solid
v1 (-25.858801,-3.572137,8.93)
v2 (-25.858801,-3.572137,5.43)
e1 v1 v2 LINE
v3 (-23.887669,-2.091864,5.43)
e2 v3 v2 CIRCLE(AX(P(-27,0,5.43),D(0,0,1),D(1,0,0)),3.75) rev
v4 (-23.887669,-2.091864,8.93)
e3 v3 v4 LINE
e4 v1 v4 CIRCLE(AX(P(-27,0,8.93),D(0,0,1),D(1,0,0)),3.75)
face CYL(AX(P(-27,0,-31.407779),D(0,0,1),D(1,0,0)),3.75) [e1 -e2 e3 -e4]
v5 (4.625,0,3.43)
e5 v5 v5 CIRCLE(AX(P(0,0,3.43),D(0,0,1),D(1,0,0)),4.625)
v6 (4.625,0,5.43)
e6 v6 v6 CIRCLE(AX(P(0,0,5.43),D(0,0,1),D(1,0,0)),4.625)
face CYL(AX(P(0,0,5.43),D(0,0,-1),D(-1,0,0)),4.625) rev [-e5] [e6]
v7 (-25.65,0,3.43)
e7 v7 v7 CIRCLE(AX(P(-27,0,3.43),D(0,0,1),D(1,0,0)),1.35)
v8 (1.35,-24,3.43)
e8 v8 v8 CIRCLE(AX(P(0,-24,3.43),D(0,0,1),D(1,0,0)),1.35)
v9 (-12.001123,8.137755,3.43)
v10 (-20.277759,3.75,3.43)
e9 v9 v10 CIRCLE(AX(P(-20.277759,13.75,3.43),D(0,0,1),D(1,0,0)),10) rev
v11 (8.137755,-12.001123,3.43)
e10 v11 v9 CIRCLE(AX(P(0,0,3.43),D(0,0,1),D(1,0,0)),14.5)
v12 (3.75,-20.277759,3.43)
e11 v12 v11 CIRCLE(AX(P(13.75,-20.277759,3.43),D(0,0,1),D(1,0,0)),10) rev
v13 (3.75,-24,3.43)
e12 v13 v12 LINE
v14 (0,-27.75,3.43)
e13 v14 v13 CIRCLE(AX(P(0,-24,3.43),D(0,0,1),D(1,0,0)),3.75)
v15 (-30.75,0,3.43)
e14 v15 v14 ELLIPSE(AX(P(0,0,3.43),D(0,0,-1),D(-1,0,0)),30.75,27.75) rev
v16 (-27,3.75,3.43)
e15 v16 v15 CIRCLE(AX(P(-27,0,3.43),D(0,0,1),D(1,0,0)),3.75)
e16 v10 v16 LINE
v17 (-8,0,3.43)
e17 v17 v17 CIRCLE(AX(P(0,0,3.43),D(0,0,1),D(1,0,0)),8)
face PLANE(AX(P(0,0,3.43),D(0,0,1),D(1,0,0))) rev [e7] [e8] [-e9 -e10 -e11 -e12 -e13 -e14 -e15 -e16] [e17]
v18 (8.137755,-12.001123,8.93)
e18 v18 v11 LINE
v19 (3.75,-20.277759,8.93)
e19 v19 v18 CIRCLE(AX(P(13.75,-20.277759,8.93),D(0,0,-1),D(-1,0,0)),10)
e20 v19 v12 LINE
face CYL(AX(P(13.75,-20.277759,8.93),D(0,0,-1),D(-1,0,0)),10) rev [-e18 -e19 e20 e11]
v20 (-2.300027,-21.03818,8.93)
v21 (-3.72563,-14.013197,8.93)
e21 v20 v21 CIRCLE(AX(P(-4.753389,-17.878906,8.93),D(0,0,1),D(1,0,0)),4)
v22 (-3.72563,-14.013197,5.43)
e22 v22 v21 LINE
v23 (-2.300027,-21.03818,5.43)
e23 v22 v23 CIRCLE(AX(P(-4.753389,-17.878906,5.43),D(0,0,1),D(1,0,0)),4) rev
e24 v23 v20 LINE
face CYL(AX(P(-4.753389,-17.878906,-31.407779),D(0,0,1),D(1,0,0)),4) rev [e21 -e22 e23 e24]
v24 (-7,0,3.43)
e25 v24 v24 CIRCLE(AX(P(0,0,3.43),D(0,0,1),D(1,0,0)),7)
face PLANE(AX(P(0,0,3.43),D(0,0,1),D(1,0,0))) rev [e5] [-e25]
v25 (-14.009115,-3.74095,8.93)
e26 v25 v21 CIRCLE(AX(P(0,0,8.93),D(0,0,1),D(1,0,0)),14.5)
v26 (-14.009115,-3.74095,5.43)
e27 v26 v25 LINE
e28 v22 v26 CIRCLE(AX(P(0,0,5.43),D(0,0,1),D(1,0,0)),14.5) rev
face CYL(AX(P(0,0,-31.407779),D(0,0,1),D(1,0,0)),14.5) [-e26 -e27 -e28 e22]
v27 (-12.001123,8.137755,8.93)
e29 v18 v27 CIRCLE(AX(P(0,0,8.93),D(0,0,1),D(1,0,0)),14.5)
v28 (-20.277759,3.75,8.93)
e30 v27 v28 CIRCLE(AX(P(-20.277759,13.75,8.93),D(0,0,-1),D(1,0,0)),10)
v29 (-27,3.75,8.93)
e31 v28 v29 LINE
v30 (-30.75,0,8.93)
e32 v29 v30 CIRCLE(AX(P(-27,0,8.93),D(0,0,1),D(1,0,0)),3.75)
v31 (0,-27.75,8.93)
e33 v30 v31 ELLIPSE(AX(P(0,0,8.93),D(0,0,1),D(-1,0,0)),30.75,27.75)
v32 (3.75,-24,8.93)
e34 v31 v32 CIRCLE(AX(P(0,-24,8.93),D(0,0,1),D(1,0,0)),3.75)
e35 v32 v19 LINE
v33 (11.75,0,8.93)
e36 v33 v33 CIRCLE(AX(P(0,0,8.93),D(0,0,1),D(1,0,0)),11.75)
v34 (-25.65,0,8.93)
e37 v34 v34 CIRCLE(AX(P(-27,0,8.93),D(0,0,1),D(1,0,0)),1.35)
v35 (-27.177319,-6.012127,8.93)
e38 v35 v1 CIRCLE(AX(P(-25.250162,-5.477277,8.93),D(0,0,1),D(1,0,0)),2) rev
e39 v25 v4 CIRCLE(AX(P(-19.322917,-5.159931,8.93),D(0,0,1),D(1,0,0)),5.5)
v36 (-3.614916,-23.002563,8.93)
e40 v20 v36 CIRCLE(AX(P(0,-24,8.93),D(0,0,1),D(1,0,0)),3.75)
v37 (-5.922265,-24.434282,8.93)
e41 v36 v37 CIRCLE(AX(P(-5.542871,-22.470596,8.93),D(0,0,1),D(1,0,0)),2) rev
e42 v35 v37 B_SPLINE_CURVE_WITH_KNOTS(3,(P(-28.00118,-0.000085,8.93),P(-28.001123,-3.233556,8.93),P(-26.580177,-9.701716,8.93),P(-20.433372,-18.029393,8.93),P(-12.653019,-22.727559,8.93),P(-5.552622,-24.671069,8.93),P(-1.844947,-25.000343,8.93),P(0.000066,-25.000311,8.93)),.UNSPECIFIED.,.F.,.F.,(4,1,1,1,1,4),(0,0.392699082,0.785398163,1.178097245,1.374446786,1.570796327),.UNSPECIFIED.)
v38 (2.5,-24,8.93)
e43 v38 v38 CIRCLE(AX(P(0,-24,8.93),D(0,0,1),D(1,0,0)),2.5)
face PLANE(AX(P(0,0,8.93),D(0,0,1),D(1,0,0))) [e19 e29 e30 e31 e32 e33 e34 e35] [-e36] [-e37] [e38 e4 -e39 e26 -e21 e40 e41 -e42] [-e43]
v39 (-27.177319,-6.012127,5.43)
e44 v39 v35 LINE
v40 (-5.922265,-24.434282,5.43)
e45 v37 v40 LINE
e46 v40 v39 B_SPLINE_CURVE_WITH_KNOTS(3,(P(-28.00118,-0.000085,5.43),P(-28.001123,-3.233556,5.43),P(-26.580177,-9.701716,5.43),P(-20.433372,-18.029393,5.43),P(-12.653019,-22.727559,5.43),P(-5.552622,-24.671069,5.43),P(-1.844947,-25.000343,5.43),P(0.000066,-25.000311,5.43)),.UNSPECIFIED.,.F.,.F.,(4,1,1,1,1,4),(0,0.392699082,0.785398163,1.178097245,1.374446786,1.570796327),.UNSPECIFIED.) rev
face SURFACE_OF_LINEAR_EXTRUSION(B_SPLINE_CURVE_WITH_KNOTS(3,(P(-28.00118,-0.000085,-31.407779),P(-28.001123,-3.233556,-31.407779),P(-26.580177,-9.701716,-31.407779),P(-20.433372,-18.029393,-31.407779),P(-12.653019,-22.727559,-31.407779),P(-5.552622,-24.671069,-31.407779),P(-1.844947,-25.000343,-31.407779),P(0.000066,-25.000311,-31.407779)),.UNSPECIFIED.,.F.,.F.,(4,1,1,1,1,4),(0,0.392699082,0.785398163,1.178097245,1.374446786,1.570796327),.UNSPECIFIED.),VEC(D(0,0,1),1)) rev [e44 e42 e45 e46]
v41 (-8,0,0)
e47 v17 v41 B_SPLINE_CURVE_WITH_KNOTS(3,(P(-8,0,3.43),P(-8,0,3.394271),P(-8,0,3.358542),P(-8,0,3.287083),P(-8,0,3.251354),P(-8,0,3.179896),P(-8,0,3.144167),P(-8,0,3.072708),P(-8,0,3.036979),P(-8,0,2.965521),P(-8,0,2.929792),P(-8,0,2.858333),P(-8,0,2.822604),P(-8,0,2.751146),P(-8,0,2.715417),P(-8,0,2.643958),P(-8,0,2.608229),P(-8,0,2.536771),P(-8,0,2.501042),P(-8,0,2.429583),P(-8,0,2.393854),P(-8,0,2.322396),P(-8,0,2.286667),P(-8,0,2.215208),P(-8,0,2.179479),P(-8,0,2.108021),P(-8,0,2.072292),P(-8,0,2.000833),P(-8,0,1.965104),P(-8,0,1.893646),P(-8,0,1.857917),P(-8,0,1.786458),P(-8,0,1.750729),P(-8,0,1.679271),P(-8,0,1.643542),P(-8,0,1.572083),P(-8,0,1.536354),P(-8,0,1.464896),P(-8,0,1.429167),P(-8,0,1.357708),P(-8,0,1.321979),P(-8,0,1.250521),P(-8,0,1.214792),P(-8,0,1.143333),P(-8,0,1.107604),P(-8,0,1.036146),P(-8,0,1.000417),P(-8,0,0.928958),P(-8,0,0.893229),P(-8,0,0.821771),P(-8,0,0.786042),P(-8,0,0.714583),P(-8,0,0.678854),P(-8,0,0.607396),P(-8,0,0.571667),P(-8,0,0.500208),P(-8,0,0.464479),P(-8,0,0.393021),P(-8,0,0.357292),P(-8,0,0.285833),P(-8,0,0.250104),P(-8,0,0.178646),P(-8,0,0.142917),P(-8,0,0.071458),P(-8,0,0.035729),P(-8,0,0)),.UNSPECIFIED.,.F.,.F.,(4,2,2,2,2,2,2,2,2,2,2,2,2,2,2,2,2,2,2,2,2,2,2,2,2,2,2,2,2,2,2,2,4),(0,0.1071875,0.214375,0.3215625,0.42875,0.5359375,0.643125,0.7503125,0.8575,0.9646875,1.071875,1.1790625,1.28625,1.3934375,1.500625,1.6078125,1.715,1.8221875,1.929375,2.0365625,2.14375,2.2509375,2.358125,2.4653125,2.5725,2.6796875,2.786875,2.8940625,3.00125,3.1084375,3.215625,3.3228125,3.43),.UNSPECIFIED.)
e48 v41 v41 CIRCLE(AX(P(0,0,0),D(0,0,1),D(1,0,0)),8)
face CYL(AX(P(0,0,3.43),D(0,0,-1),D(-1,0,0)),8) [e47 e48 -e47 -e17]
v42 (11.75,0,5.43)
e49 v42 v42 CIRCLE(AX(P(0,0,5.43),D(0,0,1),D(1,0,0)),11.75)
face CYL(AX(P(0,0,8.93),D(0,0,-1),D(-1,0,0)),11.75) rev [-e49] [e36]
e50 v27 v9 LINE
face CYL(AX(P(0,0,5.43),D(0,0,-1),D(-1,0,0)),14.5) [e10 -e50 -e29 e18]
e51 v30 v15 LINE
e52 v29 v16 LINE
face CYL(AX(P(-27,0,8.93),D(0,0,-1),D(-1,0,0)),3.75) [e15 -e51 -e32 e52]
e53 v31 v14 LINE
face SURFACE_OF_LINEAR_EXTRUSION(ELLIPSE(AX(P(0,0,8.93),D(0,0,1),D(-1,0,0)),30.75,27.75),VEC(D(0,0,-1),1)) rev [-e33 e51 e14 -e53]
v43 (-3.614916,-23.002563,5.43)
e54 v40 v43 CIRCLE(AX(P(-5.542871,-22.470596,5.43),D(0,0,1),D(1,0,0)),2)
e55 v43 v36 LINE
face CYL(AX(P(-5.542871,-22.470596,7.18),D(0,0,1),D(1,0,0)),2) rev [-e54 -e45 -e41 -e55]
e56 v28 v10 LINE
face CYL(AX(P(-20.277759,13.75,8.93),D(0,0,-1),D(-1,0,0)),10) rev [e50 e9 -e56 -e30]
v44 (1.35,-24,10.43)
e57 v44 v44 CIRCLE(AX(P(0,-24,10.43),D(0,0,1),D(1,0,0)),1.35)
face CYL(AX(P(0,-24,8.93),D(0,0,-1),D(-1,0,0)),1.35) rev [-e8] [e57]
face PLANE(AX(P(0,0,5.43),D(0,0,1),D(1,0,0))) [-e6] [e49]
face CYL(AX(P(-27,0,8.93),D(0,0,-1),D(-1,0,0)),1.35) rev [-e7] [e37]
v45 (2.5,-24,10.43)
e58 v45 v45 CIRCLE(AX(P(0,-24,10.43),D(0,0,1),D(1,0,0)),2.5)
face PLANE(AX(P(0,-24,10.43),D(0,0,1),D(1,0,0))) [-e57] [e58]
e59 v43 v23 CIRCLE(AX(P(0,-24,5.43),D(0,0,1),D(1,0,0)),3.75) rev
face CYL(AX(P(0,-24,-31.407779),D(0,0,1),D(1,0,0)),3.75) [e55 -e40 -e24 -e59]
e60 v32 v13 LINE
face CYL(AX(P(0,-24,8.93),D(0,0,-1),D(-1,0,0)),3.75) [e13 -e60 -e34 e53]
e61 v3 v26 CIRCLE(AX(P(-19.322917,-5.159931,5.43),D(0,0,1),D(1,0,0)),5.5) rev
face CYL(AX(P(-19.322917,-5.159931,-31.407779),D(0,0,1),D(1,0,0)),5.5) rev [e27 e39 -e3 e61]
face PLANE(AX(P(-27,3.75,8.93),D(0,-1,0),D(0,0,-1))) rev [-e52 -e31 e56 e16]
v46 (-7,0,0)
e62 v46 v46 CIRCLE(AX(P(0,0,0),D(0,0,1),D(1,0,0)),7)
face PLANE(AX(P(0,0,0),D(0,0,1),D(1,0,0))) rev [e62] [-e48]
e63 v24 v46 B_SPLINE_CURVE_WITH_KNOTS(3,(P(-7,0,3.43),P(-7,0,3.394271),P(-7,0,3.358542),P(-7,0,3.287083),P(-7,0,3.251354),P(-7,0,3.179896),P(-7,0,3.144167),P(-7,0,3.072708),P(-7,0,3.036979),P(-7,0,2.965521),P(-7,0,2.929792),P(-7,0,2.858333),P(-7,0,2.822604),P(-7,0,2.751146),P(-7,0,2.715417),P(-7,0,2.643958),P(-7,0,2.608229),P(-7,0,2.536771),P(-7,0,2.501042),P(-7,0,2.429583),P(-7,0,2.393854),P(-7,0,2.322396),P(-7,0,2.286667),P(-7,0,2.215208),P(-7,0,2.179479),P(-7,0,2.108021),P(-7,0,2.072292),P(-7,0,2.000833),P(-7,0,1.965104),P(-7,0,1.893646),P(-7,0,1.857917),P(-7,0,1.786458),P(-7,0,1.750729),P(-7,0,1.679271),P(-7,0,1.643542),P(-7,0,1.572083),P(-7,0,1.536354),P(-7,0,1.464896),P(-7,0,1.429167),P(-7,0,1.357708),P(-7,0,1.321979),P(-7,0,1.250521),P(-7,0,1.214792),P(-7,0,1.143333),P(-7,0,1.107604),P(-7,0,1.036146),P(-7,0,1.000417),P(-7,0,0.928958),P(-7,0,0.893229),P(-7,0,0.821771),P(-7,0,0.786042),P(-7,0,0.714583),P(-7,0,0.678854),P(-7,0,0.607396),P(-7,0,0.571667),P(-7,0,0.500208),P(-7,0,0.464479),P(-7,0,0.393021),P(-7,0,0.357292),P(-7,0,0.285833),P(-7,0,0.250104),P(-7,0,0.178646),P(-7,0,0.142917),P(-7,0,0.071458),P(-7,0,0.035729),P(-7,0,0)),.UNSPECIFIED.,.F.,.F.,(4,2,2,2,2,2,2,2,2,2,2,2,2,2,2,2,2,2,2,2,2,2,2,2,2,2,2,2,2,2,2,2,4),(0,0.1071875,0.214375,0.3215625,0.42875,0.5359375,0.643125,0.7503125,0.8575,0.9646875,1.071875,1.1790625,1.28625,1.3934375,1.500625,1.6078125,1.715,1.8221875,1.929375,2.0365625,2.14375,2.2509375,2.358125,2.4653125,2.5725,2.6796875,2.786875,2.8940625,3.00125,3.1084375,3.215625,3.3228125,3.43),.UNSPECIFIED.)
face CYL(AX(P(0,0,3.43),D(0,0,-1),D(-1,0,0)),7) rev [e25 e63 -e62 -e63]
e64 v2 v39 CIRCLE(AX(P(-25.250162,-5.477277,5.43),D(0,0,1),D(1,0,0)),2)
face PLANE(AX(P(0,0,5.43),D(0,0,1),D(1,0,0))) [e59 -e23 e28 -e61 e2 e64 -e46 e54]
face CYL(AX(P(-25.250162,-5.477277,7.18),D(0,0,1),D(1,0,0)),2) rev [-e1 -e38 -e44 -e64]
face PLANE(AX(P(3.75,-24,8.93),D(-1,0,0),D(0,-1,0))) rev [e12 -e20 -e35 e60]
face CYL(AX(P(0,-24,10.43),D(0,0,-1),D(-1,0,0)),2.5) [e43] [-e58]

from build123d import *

# Parameters (mm, degrees)
SKETCH1_R           = 8
SKETCH1_R_2         = 7
BOSS_EXTRUDE1_DEPTH = 3.43
SKETCH2_R           = 14.5
SKETCH2_R_2         = 4.625
BOSS_EXTRUDE2_DEPTH = 2
SKETCH3_R           = 11.75
SKETCH3_R_2         = 1.35
BOSS_EXTRUDE3_DEPTH = 3.5
BOSS_EXTRUDE4_START = 2
SKETCH4_R           = 1.35
BOSS_EXTRUDE4_DEPTH = 2
CUT_EXTRUDE1_START  = -3.5
CUT_EXTRUDE1_DEPTH  = 3.5
FILLET1_R           = 2
SKETCH8_R           = 2.5
SKETCH8_R_2         = 1.35
BOSS_EXTRUDE6_DEPTH = 1.5


# Read off the part's stored shape, not the designer's step: Cut-Extrude1
with BuildPart() as part:
    # Sketch1 → Boss-Extrude1 (new body)
    with BuildSketch(Plane.XY):
        with Locations(Location((0, 0, 0), (0, 0, 180))):
            Circle(SKETCH1_R)
        with Locations(Location((0, 0, 0), (0, 0, 180))):
            Circle(SKETCH1_R_2, mode=Mode.SUBTRACT)
    extrude(amount=BOSS_EXTRUDE1_DEPTH)

    # Sketch2 → Boss-Extrude2 (add)
    with BuildSketch(Plane.XY.offset(3.43)):
        Circle(SKETCH2_R)
        Circle(SKETCH2_R_2, mode=Mode.SUBTRACT)
    extrude(amount=BOSS_EXTRUDE2_DEPTH)

    # Sketch3 → Boss-Extrude3 (add)
    with BuildSketch(Plane.XY.offset(5.43)):
        with BuildLine():
            Line((3.75, -24), (3.75, -20.277758752))
            ThreePointArc((3.75, -20.277758752), (4.914773659, -15.593874092), (8.137755102, -12.001122527))
            ThreePointArc((8.137755102, -12.001122527), (10.253048327, 10.253048327), (-12.001122527, 8.137755102))
            ThreePointArc((-12.001122527, 8.137755102), (-15.593874092, 4.914773659), (-20.277758752, 3.75))
            Line((-20.277758752, 3.75), (-27, 3.75))
            ThreePointArc((-27, 3.75), (-29.651650429, 2.651650429), (-30.75, 0))
            add(Edge.make_bspline(
                [(-30.75, 0), (-30.75, -27.75), (0, -27.75)],
                knots=[0, 0, 0, 1.570796327, 1.570796327, 1.570796327], degree=2, weights=[1, 0.707106781, 1]))
            ThreePointArc((0, -27.75), (2.651650429, -26.651650429), (3.75, -24))
        make_face()
        Circle(SKETCH3_R, mode=Mode.SUBTRACT)
        with Locations((0, -24)):
            Circle(SKETCH3_R_2, mode=Mode.SUBTRACT)
        with Locations((-27, 0)):
            Circle(SKETCH3_R_2, mode=Mode.SUBTRACT)
    extrude(amount=BOSS_EXTRUDE3_DEPTH)

    # Sketch4 → Boss-Extrude4 (add)
    with BuildSketch(Plane(origin=(0, 0, 5.43), x_dir=(-1, 0, 0), z_dir=(0, 0, -1)).offset(BOSS_EXTRUDE4_START)):
        with BuildLine():
            Line((-3.75, -20.277758752), (-3.75, -24))
            ThreePointArc((-3.75, -24), (-2.651650429, -26.651650429), (0, -27.75))
            add(Edge.make_bspline(
                [(0, -27.75), (30.75, -27.75), (30.75, 0)],
                knots=[4.71238898, 4.71238898, 4.71238898, 6.283185307, 6.283185307, 6.283185307], degree=2, weights=[1, 0.707106781, 1]))
            ThreePointArc((30.75, 0), (29.651650429, 2.651650429), (27, 3.75))
            Line((27, 3.75), (20.277758752, 3.75))
            ThreePointArc((20.277758752, 3.75), (15.593874092, 4.914773659), (12.001122527, 8.137755102))
            ThreePointArc((12.001122527, 8.137755102), (10.253048327, -10.253048327), (-8.137755102, -12.001122527))
            ThreePointArc((-8.137755102, -12.001122527), (-4.914773659, -15.593874092), (-3.75, -20.277758752))
        make_face()
        with Locations(Location((27, 0, 0), (0, 0, 180))):
            Circle(SKETCH4_R, mode=Mode.SUBTRACT)
        with Locations(Location((0, -24, 0), (0, 0, 180))):
            Circle(SKETCH4_R, mode=Mode.SUBTRACT)
    extrude(amount=-BOSS_EXTRUDE4_DEPTH)

    # Cut-Extrude1 outline → Cut-Extrude1 (cut)
    with BuildSketch(Plane.XY.offset(8.93).offset(CUT_EXTRUDE1_START)):
        with BuildLine():
            ThreePointArc((-23.887668919, -2.091864059), (-25.551843779, -3.459095772), (-27.693722308, -3.685274665))
            add(Edge.make_bspline(
                [(-27.693722308, -3.685274665), (-27.362240175, -5.665830378), (-25.799154504, -10.759842679), (-20.433371513, -18.029392928), (-12.653019422, -22.727558912), (-6.72944223, -24.348951045), (-4.285685075, -24.711452028), (-3.667038232, -24.784430116)],
                knots=[0.149690792, 0.149690792, 0.149690792, 0.149690792, 0.392699082, 0.785398163, 1.178097245, 1.374446786, 1.440624357, 1.440624357, 1.440624357, 1.440624357], degree=3))
            ThreePointArc((-3.667038232, -24.784430116), (-3.522792072, -22.714528875), (-2.300027155, -21.038180444))
            ThreePointArc((-2.300027155, -21.038180444), (-0.83329357, -17.083388646), (-3.725629572, -14.013196791))
            ThreePointArc((-3.725629572, -14.013196791), (-10.247441141, -10.258652449), (-14.009114583, -3.740950226))
            ThreePointArc((-14.009114583, -3.740950226), (-18.417300739, 0.264998128), (-23.887668919, -2.091864059))
        make_face()
    extrude(amount=CUT_EXTRUDE1_DEPTH, mode=Mode.SUBTRACT)

    # Fillet1
    fillet1_edges = [part.edges().sort_by_distance(p)[0] for p in [
        (-3.667038232, -24.784430116, 7.18),
        (-27.693722308, -3.685274665, 7.18),
    ]]
    fillet(fillet1_edges, radius=FILLET1_R)

    # Sketch8 → Boss-Extrude6 (add)
    with BuildSketch(Plane.XY.offset(8.93)):
        with Locations((0, -24)):
            Circle(SKETCH8_R)
        with Locations((0, -24)):
            Circle(SKETCH8_R_2, mode=Mode.SUBTRACT)
    extrude(amount=BOSS_EXTRUDE6_DEPTH)


solid = part.part
